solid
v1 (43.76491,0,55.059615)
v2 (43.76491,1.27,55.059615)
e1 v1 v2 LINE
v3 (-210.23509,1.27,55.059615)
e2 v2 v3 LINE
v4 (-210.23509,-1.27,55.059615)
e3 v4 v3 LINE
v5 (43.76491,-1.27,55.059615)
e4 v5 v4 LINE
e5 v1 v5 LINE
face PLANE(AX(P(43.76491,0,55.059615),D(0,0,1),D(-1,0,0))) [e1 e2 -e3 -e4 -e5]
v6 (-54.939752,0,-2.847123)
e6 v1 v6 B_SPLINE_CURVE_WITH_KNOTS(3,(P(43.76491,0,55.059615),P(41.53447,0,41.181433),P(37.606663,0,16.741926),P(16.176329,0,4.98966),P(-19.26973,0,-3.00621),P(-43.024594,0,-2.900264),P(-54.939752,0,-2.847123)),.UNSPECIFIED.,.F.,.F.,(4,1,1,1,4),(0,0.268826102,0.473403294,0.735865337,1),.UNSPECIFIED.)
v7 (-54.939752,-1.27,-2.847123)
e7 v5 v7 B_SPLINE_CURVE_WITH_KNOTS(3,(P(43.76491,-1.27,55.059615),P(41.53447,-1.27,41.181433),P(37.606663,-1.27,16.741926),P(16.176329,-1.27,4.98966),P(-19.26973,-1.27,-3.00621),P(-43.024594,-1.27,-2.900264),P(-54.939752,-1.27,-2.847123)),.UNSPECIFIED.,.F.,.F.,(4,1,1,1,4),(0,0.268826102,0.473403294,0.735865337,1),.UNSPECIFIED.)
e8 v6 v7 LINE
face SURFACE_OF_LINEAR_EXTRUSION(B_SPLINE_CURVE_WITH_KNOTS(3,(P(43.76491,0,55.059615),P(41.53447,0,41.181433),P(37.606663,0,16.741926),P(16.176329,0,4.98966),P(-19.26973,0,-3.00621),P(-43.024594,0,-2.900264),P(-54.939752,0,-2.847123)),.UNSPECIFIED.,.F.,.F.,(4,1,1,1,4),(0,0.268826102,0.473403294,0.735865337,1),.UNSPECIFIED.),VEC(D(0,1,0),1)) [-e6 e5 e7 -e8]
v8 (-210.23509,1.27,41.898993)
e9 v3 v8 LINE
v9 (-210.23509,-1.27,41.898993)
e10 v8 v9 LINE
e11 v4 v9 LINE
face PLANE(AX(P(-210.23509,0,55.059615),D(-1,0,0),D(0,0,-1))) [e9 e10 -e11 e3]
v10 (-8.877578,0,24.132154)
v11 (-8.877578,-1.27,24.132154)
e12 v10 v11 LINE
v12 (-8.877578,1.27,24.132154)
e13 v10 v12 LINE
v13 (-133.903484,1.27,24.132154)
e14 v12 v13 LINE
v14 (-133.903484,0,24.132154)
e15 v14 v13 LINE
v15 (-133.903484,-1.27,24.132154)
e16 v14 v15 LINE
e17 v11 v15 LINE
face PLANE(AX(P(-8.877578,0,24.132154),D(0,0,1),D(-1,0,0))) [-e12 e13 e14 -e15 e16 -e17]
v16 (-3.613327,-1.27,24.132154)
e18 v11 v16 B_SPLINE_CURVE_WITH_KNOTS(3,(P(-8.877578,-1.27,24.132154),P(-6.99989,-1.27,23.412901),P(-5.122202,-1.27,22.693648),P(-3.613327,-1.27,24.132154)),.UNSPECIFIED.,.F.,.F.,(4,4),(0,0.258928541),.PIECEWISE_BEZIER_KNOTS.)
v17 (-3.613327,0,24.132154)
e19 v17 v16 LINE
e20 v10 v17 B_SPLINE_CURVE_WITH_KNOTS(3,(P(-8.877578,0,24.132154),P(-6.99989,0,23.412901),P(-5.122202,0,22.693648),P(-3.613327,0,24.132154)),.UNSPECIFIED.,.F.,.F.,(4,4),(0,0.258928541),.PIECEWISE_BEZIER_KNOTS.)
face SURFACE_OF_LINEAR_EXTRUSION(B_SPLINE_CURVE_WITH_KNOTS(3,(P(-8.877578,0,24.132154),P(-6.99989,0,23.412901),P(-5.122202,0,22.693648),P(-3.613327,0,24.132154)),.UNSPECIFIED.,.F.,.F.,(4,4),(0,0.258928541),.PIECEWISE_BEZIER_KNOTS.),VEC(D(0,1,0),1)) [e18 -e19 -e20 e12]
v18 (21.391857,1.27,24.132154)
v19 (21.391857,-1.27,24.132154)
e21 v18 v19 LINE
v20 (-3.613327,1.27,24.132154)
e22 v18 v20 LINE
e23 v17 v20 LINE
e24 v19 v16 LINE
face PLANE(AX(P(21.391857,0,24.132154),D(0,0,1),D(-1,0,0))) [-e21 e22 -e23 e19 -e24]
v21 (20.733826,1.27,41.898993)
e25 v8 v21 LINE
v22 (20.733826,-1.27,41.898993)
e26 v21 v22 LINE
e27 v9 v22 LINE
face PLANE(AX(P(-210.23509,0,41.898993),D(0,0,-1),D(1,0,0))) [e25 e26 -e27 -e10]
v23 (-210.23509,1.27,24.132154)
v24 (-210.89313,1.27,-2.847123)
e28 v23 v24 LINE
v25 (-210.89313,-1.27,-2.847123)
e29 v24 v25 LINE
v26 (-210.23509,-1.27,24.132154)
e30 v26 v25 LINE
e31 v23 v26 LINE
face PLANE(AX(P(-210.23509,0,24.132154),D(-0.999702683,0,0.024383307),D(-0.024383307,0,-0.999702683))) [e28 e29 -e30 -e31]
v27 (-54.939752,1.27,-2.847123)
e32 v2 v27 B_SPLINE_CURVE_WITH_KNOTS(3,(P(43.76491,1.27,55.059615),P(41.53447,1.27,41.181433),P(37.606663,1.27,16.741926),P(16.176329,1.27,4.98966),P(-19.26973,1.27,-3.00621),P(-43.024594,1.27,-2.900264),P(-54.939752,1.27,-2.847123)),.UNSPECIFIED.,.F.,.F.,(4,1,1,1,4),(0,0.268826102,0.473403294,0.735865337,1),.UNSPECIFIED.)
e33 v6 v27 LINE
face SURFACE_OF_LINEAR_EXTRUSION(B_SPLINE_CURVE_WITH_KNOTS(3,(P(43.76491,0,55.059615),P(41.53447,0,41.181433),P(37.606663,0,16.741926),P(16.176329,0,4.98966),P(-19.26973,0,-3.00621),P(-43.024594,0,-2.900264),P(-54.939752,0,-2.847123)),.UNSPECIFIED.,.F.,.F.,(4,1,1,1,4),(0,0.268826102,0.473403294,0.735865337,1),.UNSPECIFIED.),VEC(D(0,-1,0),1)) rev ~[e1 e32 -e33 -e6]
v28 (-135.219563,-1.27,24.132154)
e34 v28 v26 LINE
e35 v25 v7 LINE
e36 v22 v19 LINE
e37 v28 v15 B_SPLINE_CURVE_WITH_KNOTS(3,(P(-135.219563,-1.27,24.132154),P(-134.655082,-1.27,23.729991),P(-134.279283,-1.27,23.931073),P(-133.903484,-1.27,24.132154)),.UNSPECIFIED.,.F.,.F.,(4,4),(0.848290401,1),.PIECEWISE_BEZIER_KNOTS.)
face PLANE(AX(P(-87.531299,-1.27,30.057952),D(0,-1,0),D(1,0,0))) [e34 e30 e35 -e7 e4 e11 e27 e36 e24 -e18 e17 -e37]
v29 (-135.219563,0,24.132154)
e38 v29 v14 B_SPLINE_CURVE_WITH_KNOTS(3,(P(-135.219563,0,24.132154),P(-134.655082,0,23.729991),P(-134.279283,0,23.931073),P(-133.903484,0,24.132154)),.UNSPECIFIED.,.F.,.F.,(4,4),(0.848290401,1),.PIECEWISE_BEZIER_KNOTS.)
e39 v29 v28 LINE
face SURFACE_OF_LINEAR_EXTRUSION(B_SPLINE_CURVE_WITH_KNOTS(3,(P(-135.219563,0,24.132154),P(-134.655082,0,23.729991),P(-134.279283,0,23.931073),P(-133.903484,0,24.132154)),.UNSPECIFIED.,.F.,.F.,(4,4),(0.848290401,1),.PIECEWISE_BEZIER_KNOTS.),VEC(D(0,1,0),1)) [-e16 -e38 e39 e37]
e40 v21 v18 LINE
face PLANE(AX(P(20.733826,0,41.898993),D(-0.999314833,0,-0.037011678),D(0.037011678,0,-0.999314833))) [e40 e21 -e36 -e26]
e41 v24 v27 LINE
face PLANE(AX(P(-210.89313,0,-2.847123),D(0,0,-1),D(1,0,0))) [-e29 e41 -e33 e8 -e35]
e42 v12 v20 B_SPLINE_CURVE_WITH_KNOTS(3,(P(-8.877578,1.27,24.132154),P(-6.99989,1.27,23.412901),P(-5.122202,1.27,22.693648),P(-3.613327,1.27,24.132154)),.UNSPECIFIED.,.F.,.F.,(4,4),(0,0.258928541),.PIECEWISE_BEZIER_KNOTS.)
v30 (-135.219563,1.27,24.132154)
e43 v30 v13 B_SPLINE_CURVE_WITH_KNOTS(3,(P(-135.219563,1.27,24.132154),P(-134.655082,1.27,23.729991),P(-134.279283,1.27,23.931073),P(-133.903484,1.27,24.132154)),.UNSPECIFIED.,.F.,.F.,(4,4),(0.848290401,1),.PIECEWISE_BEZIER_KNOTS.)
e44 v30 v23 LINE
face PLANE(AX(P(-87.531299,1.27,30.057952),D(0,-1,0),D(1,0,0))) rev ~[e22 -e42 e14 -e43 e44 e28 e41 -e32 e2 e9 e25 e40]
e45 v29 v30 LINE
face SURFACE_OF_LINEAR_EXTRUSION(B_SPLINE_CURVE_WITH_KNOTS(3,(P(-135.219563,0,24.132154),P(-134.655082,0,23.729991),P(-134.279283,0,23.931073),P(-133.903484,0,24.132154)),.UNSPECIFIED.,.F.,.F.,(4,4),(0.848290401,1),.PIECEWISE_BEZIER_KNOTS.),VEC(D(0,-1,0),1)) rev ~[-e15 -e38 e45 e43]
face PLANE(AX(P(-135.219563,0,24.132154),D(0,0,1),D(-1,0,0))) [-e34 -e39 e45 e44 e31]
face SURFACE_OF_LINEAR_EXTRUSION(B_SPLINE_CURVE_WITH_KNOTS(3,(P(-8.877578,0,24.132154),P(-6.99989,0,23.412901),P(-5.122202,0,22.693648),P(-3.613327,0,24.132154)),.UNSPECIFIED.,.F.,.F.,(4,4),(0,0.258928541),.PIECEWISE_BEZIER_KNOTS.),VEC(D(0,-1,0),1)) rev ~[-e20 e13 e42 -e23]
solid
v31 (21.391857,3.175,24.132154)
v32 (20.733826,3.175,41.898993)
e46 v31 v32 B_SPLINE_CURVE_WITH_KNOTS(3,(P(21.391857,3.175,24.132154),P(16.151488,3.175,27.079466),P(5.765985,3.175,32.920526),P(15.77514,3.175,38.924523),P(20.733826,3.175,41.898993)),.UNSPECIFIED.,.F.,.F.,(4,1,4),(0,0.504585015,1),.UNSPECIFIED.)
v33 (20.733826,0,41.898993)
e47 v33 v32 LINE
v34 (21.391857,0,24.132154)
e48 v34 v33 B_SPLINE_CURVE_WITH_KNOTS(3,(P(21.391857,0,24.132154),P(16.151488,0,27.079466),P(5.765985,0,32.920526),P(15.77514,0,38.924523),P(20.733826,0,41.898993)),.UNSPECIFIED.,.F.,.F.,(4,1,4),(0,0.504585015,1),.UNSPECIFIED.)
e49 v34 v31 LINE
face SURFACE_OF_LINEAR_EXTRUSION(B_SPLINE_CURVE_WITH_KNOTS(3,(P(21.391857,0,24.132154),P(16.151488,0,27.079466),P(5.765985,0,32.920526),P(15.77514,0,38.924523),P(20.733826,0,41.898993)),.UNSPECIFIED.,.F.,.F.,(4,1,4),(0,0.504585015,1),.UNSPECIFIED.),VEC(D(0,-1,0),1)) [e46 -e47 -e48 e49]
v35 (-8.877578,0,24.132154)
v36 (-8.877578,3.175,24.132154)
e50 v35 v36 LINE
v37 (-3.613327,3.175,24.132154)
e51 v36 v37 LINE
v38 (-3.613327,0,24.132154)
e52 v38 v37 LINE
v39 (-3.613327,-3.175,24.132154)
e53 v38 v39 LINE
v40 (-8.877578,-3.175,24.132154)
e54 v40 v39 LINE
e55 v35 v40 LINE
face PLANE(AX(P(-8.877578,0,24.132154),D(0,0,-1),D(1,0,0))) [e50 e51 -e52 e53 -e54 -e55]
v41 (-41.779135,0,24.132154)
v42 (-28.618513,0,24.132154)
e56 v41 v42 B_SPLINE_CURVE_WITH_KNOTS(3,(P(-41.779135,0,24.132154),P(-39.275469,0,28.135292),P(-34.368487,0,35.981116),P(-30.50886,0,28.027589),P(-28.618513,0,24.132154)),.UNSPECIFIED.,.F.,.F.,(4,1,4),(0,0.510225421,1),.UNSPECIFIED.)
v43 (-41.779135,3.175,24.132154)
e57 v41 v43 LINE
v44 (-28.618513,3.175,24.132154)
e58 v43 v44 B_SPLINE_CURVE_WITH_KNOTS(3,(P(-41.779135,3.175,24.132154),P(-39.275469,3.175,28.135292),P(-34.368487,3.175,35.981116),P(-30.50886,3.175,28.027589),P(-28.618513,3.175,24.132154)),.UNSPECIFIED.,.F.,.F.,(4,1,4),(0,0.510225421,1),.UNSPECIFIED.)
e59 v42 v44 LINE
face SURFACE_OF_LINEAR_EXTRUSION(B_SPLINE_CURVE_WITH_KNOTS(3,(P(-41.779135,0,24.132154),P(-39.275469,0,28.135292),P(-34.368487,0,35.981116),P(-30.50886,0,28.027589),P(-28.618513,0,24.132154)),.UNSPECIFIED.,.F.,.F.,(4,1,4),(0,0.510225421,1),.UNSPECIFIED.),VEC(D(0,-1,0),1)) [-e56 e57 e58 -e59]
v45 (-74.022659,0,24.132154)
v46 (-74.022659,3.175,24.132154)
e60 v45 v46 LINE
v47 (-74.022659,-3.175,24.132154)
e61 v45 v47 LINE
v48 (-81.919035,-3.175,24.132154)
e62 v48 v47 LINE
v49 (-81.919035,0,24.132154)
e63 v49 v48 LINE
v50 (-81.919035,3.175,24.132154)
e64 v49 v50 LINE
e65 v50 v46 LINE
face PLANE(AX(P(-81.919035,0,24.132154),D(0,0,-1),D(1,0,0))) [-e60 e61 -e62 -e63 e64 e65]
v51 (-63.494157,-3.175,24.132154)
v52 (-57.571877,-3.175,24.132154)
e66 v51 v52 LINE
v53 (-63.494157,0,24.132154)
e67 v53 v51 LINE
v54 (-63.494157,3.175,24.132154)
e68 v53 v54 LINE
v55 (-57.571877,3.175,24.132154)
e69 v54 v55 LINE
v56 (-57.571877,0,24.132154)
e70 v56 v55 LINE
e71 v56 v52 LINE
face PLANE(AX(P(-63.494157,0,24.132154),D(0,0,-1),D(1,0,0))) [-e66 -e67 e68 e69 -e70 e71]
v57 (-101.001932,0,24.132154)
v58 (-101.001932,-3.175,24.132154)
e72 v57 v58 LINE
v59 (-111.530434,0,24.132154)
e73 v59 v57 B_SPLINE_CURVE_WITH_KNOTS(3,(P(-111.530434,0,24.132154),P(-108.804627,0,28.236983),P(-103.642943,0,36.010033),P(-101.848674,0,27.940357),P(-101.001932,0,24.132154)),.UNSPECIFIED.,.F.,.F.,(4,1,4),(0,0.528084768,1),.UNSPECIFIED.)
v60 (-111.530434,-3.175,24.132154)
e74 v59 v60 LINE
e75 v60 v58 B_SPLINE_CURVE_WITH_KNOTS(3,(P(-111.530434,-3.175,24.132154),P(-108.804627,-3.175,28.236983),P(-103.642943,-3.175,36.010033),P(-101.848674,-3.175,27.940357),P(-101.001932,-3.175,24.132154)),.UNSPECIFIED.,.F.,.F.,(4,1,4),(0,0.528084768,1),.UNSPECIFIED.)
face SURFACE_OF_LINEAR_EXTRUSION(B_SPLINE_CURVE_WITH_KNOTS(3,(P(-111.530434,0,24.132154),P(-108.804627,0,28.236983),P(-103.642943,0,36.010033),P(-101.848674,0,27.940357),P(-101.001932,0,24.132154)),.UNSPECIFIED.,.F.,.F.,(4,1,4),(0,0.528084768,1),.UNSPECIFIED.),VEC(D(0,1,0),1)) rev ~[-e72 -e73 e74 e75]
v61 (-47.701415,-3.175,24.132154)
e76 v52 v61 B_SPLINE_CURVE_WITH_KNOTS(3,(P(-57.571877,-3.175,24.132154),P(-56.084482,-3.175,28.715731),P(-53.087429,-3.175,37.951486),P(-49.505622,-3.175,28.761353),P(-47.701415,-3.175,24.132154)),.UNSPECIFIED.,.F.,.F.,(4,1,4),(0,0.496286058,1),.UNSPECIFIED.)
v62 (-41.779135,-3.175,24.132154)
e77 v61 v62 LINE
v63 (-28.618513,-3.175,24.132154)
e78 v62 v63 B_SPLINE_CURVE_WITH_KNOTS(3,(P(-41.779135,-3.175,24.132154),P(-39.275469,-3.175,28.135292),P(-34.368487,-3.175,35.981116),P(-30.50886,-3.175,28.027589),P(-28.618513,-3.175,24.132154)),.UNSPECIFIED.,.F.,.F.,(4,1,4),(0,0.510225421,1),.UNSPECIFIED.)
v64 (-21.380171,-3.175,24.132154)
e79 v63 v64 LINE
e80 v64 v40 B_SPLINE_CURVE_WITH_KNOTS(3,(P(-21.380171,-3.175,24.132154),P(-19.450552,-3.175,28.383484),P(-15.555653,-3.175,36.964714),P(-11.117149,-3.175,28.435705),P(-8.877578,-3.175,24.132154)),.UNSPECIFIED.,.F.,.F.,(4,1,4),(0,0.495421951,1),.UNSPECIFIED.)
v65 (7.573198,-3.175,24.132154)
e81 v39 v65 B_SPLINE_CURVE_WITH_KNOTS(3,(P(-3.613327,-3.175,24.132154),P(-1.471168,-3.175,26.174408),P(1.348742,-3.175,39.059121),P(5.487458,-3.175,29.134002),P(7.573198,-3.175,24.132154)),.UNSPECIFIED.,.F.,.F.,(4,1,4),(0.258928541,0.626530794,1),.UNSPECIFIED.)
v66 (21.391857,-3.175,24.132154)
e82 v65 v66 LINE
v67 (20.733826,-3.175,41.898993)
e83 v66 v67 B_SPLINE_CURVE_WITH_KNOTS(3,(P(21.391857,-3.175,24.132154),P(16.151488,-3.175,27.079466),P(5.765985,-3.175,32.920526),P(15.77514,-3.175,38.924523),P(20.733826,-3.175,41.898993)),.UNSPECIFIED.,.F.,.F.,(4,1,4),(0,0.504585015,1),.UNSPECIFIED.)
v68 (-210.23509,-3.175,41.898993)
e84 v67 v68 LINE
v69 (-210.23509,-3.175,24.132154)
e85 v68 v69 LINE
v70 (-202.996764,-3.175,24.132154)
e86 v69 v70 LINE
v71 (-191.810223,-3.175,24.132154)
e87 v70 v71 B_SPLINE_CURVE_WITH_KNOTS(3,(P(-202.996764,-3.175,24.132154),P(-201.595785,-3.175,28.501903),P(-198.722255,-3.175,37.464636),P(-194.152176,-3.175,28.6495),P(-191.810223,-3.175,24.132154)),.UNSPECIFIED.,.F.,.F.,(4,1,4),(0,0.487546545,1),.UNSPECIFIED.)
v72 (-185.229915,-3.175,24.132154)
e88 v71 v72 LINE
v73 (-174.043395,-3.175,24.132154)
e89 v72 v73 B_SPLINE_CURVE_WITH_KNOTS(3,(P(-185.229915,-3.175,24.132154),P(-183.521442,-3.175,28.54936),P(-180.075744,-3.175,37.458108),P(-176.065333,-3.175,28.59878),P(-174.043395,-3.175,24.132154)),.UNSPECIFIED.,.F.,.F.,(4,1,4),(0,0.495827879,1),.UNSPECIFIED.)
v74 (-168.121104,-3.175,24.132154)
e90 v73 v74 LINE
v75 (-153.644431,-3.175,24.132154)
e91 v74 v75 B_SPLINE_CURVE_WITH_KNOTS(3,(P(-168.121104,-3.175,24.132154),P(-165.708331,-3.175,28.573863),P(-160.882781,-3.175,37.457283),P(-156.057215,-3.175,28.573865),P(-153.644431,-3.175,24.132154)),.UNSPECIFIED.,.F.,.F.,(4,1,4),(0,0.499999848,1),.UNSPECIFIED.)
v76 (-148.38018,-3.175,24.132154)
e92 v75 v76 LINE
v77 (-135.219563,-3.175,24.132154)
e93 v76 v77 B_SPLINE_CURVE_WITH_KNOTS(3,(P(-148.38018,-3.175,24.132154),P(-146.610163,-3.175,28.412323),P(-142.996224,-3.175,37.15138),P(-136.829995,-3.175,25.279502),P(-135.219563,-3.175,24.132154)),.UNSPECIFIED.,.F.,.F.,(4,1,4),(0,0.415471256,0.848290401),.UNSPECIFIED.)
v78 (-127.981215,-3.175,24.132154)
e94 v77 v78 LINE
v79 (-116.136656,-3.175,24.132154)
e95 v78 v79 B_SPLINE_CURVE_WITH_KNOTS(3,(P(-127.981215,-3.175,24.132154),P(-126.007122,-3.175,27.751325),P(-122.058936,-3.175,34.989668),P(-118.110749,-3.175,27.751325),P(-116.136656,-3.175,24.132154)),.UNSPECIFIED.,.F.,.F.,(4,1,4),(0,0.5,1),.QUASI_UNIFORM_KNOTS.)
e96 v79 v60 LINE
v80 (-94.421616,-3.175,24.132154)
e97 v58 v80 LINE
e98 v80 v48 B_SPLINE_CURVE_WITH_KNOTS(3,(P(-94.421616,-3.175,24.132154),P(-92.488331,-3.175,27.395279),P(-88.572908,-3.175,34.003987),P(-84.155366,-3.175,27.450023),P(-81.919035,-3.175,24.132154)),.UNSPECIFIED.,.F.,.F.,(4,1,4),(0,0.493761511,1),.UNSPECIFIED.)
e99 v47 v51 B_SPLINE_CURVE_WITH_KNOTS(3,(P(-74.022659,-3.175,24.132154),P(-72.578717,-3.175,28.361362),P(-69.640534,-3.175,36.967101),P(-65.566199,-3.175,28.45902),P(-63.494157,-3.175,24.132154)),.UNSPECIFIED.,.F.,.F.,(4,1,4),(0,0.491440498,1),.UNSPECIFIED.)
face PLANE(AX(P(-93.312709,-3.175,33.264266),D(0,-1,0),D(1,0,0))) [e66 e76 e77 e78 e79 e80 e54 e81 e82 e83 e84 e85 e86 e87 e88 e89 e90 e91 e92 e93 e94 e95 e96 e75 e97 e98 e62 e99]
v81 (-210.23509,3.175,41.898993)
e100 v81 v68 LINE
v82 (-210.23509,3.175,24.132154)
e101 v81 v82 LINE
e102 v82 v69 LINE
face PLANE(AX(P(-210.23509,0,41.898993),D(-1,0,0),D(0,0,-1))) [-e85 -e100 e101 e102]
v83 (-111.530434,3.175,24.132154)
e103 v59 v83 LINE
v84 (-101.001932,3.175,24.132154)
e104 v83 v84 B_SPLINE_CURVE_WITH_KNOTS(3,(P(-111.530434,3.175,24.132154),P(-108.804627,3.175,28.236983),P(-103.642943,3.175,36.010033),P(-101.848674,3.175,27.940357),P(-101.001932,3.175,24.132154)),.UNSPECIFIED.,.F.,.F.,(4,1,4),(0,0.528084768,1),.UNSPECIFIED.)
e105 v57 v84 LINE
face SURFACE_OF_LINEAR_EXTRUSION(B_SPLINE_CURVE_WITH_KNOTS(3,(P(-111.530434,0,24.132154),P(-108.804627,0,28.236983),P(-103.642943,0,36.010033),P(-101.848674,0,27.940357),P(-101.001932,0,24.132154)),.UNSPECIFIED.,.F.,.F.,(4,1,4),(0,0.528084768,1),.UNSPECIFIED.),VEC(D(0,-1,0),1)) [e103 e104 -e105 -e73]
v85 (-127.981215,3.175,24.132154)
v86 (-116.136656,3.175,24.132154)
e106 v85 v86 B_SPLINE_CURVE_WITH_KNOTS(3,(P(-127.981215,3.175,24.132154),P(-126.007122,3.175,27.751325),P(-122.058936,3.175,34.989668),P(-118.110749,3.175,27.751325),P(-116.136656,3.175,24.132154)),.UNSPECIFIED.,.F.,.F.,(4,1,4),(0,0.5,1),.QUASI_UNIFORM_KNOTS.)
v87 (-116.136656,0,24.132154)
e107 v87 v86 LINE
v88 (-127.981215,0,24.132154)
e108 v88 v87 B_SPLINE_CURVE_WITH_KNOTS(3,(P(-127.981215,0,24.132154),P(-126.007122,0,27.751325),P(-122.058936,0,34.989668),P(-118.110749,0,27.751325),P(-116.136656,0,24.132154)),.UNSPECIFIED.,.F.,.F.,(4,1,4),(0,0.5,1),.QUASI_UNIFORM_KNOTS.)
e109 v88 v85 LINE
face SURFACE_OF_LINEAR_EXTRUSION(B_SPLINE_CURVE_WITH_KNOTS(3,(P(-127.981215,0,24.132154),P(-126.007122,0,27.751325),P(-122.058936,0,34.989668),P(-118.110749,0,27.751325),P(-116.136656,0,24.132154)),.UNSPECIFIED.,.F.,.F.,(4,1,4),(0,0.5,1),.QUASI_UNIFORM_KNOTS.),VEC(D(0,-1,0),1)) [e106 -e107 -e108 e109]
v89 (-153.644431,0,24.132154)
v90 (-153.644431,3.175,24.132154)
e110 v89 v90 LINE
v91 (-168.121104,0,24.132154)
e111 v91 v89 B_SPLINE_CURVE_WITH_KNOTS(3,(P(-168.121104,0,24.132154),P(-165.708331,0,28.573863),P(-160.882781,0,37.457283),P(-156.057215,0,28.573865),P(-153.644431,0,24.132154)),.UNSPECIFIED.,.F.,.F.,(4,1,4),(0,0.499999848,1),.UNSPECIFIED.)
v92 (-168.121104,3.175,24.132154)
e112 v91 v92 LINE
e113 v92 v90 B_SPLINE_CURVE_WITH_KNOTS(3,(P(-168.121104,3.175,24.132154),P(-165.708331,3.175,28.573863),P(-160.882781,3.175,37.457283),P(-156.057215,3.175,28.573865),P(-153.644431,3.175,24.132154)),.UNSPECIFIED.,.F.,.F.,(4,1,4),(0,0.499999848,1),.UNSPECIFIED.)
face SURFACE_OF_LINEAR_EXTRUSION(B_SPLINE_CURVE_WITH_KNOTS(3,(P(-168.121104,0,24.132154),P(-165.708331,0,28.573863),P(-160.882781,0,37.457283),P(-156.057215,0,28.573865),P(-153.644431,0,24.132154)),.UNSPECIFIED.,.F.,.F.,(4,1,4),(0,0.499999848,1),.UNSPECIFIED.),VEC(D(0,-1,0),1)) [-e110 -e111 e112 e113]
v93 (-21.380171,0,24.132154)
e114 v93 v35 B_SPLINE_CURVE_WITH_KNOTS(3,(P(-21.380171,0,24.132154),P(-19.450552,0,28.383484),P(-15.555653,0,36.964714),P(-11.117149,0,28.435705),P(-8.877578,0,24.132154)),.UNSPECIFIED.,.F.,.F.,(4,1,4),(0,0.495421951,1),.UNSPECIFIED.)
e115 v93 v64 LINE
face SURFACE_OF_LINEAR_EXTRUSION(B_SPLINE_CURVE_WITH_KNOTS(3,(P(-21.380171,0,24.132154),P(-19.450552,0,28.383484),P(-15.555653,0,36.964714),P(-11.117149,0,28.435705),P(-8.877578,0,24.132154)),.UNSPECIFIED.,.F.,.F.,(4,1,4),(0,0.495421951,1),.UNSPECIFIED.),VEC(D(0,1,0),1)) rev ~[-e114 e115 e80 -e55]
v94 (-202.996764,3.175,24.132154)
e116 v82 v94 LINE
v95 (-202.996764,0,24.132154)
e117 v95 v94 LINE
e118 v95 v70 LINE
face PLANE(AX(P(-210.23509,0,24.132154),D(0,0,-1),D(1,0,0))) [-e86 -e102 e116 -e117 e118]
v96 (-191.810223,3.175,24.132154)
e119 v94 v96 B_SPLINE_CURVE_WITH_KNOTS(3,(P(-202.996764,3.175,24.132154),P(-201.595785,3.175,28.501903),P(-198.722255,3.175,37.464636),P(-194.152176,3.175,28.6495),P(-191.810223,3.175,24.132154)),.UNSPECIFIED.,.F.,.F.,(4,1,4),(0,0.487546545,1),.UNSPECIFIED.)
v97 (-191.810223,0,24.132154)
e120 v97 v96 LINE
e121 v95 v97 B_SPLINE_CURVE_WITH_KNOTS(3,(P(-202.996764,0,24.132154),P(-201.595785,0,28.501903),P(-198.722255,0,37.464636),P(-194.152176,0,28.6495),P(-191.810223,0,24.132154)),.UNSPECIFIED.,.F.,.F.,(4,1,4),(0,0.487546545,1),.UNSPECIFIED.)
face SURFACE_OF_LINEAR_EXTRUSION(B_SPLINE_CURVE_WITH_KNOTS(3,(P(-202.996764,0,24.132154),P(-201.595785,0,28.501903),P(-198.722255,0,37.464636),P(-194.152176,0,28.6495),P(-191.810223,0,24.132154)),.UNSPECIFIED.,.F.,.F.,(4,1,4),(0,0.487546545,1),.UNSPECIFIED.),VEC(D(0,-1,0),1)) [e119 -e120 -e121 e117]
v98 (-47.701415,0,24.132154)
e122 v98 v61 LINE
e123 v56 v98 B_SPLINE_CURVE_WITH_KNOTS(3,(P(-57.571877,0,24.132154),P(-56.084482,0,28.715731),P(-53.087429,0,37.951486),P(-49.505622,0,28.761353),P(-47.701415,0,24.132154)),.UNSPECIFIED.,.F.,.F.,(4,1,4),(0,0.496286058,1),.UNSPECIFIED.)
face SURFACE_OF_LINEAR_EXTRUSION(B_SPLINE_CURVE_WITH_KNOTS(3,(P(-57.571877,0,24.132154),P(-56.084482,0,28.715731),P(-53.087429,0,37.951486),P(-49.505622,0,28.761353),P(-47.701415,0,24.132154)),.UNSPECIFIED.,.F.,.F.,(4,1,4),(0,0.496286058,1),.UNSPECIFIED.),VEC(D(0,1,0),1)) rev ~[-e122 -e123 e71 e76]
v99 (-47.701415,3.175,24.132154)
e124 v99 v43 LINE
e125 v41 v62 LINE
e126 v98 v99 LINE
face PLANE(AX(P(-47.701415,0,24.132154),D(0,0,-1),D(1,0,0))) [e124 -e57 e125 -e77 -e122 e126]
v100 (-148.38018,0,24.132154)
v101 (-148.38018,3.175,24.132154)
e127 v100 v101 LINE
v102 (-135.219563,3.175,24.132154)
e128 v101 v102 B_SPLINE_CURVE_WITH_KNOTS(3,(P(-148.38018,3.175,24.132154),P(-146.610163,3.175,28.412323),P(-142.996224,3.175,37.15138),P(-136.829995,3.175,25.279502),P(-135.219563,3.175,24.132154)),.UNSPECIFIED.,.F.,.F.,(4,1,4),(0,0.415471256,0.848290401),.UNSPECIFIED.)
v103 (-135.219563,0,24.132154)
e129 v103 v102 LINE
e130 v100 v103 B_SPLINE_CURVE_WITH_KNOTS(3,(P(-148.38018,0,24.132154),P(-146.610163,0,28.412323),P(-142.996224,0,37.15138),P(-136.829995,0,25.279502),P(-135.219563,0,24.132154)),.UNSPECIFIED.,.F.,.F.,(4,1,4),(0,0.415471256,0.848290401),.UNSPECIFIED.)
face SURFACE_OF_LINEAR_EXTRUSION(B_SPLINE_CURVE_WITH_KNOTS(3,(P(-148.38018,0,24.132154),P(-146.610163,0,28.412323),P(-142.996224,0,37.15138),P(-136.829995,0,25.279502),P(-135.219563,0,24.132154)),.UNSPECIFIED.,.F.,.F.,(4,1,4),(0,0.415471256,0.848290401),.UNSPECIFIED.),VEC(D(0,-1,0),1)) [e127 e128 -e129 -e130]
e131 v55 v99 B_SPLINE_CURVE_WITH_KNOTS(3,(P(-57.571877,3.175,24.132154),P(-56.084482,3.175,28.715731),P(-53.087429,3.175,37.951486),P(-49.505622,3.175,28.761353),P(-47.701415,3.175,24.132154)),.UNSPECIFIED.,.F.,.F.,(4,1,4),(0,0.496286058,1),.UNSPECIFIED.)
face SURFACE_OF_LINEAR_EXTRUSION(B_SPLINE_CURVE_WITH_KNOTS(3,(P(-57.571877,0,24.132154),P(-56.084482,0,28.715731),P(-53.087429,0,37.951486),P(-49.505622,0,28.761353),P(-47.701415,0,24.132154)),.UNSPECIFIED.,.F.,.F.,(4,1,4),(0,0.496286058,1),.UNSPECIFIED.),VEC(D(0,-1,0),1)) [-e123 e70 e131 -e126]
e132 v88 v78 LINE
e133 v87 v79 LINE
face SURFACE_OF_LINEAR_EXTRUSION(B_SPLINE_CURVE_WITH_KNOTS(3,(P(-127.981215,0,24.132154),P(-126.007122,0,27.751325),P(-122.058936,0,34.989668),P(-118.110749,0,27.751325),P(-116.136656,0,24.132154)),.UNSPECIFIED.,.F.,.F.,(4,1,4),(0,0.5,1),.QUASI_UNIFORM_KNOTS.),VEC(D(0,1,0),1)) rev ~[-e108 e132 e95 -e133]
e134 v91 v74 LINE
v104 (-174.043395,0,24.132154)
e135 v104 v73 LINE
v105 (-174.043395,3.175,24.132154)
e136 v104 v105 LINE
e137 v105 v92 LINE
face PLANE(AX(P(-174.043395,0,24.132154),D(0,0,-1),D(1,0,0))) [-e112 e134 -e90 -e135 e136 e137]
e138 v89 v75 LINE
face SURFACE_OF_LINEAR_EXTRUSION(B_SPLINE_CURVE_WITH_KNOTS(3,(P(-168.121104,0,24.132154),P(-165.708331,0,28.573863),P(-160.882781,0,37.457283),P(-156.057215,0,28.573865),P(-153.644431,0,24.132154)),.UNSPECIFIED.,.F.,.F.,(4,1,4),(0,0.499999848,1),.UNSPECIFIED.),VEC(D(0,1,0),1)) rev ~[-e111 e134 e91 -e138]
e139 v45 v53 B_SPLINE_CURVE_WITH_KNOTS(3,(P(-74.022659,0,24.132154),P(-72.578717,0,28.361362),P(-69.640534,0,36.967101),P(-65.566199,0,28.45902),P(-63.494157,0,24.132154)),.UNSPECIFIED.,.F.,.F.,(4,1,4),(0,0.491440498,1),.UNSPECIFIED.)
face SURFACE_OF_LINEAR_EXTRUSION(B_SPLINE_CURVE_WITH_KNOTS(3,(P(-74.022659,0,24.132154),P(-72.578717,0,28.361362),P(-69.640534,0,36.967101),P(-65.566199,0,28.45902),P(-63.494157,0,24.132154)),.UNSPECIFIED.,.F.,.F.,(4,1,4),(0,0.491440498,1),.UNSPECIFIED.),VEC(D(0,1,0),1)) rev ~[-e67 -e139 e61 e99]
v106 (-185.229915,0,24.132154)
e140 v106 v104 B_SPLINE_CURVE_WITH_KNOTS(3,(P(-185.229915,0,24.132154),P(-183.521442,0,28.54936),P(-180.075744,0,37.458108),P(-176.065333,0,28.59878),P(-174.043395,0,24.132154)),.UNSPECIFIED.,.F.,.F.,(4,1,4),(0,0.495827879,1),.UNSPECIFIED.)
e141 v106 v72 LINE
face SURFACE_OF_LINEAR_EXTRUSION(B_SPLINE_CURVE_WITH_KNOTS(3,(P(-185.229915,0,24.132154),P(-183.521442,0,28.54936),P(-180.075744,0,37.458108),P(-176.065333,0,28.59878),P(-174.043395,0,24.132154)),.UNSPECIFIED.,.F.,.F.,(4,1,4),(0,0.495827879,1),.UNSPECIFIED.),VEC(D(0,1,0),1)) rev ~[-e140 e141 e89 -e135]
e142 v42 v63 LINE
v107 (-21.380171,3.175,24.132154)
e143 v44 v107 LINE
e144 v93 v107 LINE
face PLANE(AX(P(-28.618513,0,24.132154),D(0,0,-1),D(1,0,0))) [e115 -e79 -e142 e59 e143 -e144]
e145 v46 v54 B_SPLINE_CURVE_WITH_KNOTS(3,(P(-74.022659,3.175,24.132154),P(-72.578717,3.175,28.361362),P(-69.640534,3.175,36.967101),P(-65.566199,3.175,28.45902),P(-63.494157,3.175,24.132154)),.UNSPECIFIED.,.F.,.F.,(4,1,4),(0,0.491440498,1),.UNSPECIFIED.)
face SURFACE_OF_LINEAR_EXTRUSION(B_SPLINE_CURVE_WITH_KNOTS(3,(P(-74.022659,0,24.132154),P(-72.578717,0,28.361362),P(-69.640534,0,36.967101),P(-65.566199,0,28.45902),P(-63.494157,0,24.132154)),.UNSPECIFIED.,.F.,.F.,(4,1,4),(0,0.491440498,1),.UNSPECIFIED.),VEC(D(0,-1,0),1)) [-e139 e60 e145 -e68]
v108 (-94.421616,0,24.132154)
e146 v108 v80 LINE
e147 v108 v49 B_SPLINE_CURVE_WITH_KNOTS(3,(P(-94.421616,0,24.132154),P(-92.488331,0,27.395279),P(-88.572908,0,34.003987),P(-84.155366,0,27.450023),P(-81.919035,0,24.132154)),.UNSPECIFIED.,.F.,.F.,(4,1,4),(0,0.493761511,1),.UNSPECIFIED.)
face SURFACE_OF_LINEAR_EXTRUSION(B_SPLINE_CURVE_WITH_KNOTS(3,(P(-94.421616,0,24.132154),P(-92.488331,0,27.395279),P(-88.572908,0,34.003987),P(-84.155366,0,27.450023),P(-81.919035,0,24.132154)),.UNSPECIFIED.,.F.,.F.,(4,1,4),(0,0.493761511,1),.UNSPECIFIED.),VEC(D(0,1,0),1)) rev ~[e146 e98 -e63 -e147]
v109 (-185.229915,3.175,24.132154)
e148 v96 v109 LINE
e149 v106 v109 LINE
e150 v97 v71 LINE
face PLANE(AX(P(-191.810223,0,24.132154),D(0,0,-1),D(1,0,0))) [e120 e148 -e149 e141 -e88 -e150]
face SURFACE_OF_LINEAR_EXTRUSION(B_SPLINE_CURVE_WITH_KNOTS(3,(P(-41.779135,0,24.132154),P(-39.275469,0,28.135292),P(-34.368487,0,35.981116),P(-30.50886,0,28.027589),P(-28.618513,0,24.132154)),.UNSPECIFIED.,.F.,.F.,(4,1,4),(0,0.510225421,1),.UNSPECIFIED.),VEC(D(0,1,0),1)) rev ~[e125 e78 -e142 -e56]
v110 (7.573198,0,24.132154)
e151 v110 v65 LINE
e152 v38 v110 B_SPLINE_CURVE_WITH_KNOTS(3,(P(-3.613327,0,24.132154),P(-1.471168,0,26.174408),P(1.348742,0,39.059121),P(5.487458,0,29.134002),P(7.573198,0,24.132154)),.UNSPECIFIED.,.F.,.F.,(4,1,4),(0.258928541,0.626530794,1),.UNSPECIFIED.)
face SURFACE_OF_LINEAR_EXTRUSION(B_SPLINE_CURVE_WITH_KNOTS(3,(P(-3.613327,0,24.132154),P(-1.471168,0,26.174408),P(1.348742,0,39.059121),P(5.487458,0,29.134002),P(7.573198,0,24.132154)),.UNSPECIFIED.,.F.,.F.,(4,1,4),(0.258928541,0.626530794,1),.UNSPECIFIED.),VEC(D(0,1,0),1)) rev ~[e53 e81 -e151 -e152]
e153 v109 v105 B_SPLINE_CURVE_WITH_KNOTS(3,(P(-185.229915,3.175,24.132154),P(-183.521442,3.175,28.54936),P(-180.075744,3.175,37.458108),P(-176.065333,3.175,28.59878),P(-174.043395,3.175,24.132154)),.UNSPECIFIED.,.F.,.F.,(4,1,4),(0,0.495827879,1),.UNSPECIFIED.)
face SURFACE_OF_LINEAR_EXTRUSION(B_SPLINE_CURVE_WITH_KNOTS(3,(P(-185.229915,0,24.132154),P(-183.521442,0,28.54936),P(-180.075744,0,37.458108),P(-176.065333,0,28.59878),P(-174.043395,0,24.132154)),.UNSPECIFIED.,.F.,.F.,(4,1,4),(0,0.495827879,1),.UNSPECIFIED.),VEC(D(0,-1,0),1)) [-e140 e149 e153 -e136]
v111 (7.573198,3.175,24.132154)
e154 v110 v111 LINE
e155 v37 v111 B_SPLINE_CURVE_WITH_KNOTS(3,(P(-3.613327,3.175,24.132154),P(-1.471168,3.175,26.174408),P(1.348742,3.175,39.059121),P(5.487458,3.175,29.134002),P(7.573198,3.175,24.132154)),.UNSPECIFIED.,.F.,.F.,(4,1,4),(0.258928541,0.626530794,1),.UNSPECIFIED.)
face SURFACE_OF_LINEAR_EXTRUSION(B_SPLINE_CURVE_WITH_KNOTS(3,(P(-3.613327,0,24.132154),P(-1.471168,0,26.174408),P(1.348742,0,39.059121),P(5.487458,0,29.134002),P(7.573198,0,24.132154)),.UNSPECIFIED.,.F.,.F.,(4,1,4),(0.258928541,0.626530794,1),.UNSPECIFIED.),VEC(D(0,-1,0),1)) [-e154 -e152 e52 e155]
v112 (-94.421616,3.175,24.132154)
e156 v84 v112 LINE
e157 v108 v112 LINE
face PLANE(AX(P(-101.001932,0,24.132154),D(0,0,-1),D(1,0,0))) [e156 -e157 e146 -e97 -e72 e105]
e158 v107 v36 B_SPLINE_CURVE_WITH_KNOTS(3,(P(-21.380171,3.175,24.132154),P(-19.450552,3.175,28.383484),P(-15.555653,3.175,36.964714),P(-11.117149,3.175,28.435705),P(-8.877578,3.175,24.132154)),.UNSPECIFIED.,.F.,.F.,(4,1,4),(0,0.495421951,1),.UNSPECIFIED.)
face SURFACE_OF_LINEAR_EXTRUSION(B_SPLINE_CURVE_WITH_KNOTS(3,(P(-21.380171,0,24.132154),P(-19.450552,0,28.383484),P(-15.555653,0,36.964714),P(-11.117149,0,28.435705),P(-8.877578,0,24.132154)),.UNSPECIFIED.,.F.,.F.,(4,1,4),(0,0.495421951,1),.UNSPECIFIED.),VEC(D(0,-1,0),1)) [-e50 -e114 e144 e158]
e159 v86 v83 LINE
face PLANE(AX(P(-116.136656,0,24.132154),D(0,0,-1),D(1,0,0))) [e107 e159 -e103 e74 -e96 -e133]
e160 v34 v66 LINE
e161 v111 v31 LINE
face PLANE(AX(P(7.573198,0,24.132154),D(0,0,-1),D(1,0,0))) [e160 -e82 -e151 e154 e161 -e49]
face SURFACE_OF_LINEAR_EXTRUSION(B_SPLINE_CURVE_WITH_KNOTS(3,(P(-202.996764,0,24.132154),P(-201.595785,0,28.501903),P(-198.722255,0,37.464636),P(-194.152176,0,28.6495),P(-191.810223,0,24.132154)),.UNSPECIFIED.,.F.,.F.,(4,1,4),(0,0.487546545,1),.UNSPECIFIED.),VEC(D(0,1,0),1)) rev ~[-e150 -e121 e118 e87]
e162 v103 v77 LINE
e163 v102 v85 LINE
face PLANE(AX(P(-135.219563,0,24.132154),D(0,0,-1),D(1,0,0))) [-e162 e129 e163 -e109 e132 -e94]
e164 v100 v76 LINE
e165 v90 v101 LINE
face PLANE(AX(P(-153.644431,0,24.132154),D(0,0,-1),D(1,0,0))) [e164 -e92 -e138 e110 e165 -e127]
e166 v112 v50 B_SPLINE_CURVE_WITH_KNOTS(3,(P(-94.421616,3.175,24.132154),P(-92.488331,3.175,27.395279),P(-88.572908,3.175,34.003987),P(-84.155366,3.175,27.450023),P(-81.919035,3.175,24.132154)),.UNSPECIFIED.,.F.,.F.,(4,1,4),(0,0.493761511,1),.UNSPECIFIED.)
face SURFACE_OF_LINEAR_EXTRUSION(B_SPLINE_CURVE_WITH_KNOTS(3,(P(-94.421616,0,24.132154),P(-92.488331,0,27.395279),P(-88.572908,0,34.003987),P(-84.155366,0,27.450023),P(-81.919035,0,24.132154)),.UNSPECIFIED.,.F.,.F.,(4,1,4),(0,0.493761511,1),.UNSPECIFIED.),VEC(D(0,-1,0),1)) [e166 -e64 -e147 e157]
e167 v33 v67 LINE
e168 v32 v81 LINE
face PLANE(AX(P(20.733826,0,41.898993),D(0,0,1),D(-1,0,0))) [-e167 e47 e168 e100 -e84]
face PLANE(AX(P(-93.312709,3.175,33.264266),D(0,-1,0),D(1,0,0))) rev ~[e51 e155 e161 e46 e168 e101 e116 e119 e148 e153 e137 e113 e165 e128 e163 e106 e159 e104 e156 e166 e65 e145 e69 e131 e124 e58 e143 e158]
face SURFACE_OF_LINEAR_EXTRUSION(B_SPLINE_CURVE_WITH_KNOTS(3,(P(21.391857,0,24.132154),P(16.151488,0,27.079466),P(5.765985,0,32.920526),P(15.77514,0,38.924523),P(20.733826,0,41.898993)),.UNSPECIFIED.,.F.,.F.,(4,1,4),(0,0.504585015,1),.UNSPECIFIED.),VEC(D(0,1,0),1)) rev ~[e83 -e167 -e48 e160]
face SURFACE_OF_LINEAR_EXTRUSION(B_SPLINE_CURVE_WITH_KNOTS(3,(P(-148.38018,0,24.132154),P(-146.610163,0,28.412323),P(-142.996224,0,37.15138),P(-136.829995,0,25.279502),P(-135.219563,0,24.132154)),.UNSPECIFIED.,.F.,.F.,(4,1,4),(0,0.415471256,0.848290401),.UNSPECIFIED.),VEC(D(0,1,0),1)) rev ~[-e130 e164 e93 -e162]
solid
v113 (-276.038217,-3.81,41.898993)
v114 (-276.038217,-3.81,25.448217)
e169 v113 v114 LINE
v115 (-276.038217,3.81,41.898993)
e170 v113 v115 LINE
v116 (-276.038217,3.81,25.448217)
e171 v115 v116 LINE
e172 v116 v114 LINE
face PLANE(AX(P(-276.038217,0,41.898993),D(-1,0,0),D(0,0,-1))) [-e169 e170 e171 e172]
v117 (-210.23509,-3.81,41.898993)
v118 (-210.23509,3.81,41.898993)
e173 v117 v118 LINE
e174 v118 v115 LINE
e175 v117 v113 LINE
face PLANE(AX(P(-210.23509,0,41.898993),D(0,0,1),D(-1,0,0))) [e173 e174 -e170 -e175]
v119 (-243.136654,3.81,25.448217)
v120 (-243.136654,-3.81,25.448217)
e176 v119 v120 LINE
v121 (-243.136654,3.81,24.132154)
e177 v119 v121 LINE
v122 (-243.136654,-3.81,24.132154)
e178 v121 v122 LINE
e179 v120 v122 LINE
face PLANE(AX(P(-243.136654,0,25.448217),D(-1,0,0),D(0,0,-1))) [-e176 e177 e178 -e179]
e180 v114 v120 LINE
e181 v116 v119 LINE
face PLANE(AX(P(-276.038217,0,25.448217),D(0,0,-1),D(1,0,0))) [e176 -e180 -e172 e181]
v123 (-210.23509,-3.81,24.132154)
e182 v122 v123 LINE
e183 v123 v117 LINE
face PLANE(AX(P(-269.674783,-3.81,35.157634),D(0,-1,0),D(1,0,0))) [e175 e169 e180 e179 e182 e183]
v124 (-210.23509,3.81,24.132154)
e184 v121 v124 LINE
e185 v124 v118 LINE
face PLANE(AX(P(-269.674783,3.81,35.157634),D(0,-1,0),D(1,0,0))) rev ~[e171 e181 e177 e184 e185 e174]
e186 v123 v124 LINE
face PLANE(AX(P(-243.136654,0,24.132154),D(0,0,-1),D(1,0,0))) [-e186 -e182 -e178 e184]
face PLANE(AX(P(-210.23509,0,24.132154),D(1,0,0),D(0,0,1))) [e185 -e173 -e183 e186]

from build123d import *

# Parameters (mm, degrees)
F1_DEPTH = 1.27
F2_DEPTH = 3.81
F3_DEPTH = 3.175


# Not quite as in the source:
# - the program builds the solid bodies; features that only make, move or delete a surface that nothing else refers to are left out


with BuildPart() as f1:
    # F0 (on Front) → F1 (new body, symmetric)
    with BuildSketch(Plane.XZ):
        with BuildLine():
            Line((-210.2350903421, 55.0596148509), (-210.2350903421, 41.8989928542))
            Line((-210.2350903421, 41.8989928542), (20.7338259748, 41.8989928542))
            Line((20.7338259748, 41.8989928542), (21.3918573496, 24.1321539834))
            Line((21.3918573496, 24.1321539834), (7.5731984796, 24.1321539834))
            Line((7.5731984796, 24.1321539834), (-3.6133266435, 24.1321539834))
            add(Edge.make_bspline(
                [(-8.8775776416, 24.1321539834), (-6.9998897347, 23.4129011572), (-5.1222018278, 22.693648331), (-3.6133266435, 24.1321539834)],
                knots=[0, 0, 0, 0, 0.2589285415, 0.2589285415, 0.2589285415, 0.2589285415], degree=3))
            Line((-8.8775776416, 24.1321539834), (-21.3801710128, 24.1321539834))
            Line((-21.3801710128, 24.1321539834), (-28.6185133859, 24.1321539834))
            Line((-28.6185133859, 24.1321539834), (-41.7791353826, 24.1321539834))
            Line((-41.7791353826, 24.1321539834), (-47.7014150062, 24.1321539834))
            Line((-47.7014150062, 24.1321539834), (-57.5718773798, 24.1321539834))
            Line((-57.5718773798, 24.1321539834), (-63.4941570034, 24.1321539834))
            Line((-63.4941570034, 24.1321539834), (-74.0226589996, 24.1321539834))
            Line((-74.0226589996, 24.1321539834), (-81.9190354967, 24.1321539834))
            Line((-81.9190354967, 24.1321539834), (-94.4216164963, 24.1321539834))
            Line((-94.4216164963, 24.1321539834), (-101.0019316185, 24.1321539834))
            Line((-101.0019316185, 24.1321539834), (-111.5304336147, 24.1321539834))
            Line((-111.5304336147, 24.1321539834), (-116.1366559872, 24.1321539834))
            Line((-116.1366559872, 24.1321539834), (-127.9812152344, 24.1321539834))
            Line((-127.9812152344, 24.1321539834), (-133.903483861, 24.1321539834))
            add(Edge.make_bspline(
                [(-135.219563106, 24.1321539834), (-134.6550824726, 23.7299911861), (-134.2792831668, 23.9310725847), (-133.903483861, 24.1321539834)],
                knots=[0.8482904011, 0.8482904011, 0.8482904011, 0.8482904011, 1, 1, 1, 1], degree=3))
            Line((-135.219563106, 24.1321539834), (-148.3801796042, 24.1321539834))
            Line((-148.3801796042, 24.1321539834), (-153.6444306023, 24.1321539834))
            Line((-153.6444306023, 24.1321539834), (-168.1211043515, 24.1321539834))
            Line((-168.1211043515, 24.1321539834), (-174.0433949721, 24.1321539834))
            Line((-174.0433949721, 24.1321539834), (-185.2299145968, 24.1321539834))
            Line((-185.2299145968, 24.1321539834), (-191.8102228459, 24.1321539834))
            Line((-191.8102228459, 24.1321539834), (-202.9967644645, 24.1321539834))
            Line((-202.9967644645, 24.1321539834), (-210.2350903421, 24.1321539834))
            Line((-210.2350903421, 24.1321539834), (-210.8931299646, -2.8471227594))
            Line((-210.8931299646, -2.8471227594), (-54.9397518808, -2.8471227594))
            add(Edge.make_bspline(
                [(43.7649096579, 55.0596148509), (41.5344704617, 41.1814325972), (37.606662647, 16.7419263316), (16.1763288382, 4.9896597977), (-19.2697295543, -3.0062101287), (-43.0245937063, -2.9002640541), (-54.9397518808, -2.8471227594)],
                knots=[0, 0, 0, 0, 0.2688261018, 0.4734032944, 0.7358653369, 1, 1, 1, 1], degree=3))
            Line((43.7649096579, 55.0596148509), (-210.2350903421, 55.0596148509))
        make_face()
    extrude(amount=F1_DEPTH, both=True)


with BuildPart() as f2:
    # F0 (on Front) → F2 (new body, symmetric)
    with BuildSketch(Plane.XZ):
        Polygon((-259.5874352014, 41.8989928542), (-276.0382168211, 41.8989928542), (-276.0382168211, 25.4482167329), (-270.1159262005, 25.4482167329), align=None)
        Polygon((-250.3750014533, 41.8989928542), (-259.5874352014, 41.8989928542), (-270.1159262005, 25.4482167329), (-259.5874352014, 25.4482167329), align=None)
        Polygon((-243.1366535816, 41.8989928542), (-250.3750014533, 41.8989928542), (-259.5874352014, 25.4482167329), (-243.1366535816, 25.4482167329), align=None)
        Polygon((-226.6858719619, 41.8989928542), (-243.1366535816, 41.8989928542), (-243.1366535816, 25.4482167329), align=None)
        Polygon((-226.6858719619, 41.8989928542), (-243.1366535816, 25.4482167329), (-243.1366535816, 24.1321539834), (-233.266191208, 24.1321539834), (-218.7894954648, 41.8989928542), align=None)
        Polygon((-210.2350903421, 41.8989928542), (-218.7894954648, 41.8989928542), (-233.266191208, 24.1321539834), (-220.7635923383, 24.1321539834), (-210.2350903421, 33.0155734188), align=None)
        Polygon((-210.2350903421, 33.0155734188), (-220.7635923383, 24.1321539834), (-210.2350903421, 24.1321539834), align=None)
    extrude(amount=F2_DEPTH, both=True)


with BuildPart() as f3:
    # F0 (on Front) → F3 (new body, symmetric)
    with BuildSketch(Plane.XZ):
        with BuildLine():
            Line((20.7338259748, 41.8989928542), (-210.2350903421, 41.8989928542))
            Line((-210.2350903421, 41.8989928542), (-210.2350903421, 33.0155734188))
            Line((-210.2350903421, 33.0155734188), (-210.2350903421, 24.1321539834))
            Line((-210.2350903421, 24.1321539834), (-202.9967644645, 24.1321539834))
            add(Edge.make_bspline(
                [(-202.9967644645, 24.1321539834), (-201.5957848409, 28.5019031742), (-198.7222548422, 37.4646355189), (-194.1521756938, 28.6495004192), (-191.8102228459, 24.1321539834)],
                knots=[0, 0, 0, 0, 0.4875465453, 1, 1, 1, 1], degree=3))
            Line((-191.8102228459, 24.1321539834), (-185.2299145968, 24.1321539834))
            add(Edge.make_bspline(
                [(-185.2299145968, 24.1321539834), (-183.5214416822, 28.5493597006), (-180.0757441181, 37.4581078877), (-176.0653326357, 28.5987800772), (-174.0433949721, 24.1321539834)],
                knots=[0, 0, 0, 0, 0.4958278789, 1, 1, 1, 1], degree=3))
            Line((-174.0433949721, 24.1321539834), (-168.1211043515, 24.1321539834))
            add(Edge.make_bspline(
                [(-168.1211043515, 24.1321539834), (-165.7083305261, 28.5738628036), (-160.8827814128, 37.4572831365), (-156.0572146933, 28.5738645986), (-153.6444306023, 24.1321539834)],
                knots=[0, 0, 0, 0, 0.4999998484, 1, 1, 1, 1], degree=3))
            Line((-153.6444306023, 24.1321539834), (-148.3801796042, 24.1321539834))
            add(Edge.make_bspline(
                [(-148.3801796042, 24.1321539834), (-146.6101632269, 28.4123234005), (-142.9962239159, 37.1513795538), (-136.8299953213, 25.2795023356), (-135.219563106, 24.1321539834)],
                knots=[0, 0, 0, 0, 0.4154712555, 0.8482904011, 0.8482904011, 0.8482904011, 0.8482904011], degree=3))
            Line((-135.219563106, 24.1321539834), (-133.903483861, 24.1321539834))
            Line((-133.903483861, 24.1321539834), (-127.9812152344, 24.1321539834))
            add(Edge.make_bspline(
                [(-127.9812152344, 24.1321539834), (-126.0071220265, 27.75132517), (-122.0589356108, 34.9896675431), (-118.1107491951, 27.75132517), (-116.1366559872, 24.1321539834)],
                knots=[0, 0, 0, 0, 0.5, 1, 1, 1, 1], degree=3))
            Line((-116.1366559872, 24.1321539834), (-111.5304336147, 24.1321539834))
            add(Edge.make_bspline(
                [(-111.5304336147, 24.1321539834), (-108.8046270355, 28.2369832553), (-103.642943259, 36.0100331921), (-101.848674416, 27.9403570656), (-101.0019316185, 24.1321539834)],
                knots=[0, 0, 0, 0, 0.5280847679, 1, 1, 1, 1], degree=3))
            Line((-101.0019316185, 24.1321539834), (-94.4216164963, 24.1321539834))
            add(Edge.make_bspline(
                [(-94.4216164963, 24.1321539834), (-92.488331209, 27.3952792744), (-88.5729079881, 34.0039865465), (-84.1553655194, 27.4500227235), (-81.9190354967, 24.1321539834)],
                knots=[0, 0, 0, 0, 0.4937615114, 1, 1, 1, 1], degree=3))
            Line((-81.9190354967, 24.1321539834), (-74.0226589996, 24.1321539834))
            add(Edge.make_bspline(
                [(-74.0226589996, 24.1321539834), (-72.5787170502, 28.3613624742), (-69.6405343905, 36.967101131), (-65.5661989873, 28.4590196598), (-63.4941570034, 24.1321539834)],
                knots=[0, 0, 0, 0, 0.491440498, 1, 1, 1, 1], degree=3))
            Line((-63.4941570034, 24.1321539834), (-57.5718773798, 24.1321539834))
            add(Edge.make_bspline(
                [(-57.5718773798, 24.1321539834), (-56.084481964, 28.7157307739), (-53.0874293735, 37.9514864762), (-49.5056215462, 28.7613525636), (-47.7014150062, 24.1321539834)],
                knots=[0, 0, 0, 0, 0.496286058, 1, 1, 1, 1], degree=3))
            Line((-47.7014150062, 24.1321539834), (-41.7791353826, 24.1321539834))
            add(Edge.make_bspline(
                [(-41.7791353826, 24.1321539834), (-39.275468623, 28.135292461), (-34.3684870064, 35.9811157289), (-30.5088603888, 28.0275891282), (-28.6185133859, 24.1321539834)],
                knots=[0, 0, 0, 0, 0.5102254207, 1, 1, 1, 1], degree=3))
            Line((-28.6185133859, 24.1321539834), (-21.3801710128, 24.1321539834))
            add(Edge.make_bspline(
                [(-21.3801710128, 24.1321539834), (-19.4505524478, 28.3834837385), (-15.5556532425, 36.9647138246), (-11.1171492996, 28.4357047423), (-8.8775776416, 24.1321539834)],
                knots=[0, 0, 0, 0, 0.4954219514, 1, 1, 1, 1], degree=3))
            Line((-8.8775776416, 24.1321539834), (-3.6133266435, 24.1321539834))
            add(Edge.make_bspline(
                [(-3.6133266435, 24.1321539834), (-1.4711683739, 26.1744082476), (1.3487420826, 39.0591214669), (5.4874578129, 29.1340017152), (7.5731984796, 24.1321539834)],
                knots=[0.2589285415, 0.2589285415, 0.2589285415, 0.2589285415, 0.6265307939, 1, 1, 1, 1], degree=3))
            Line((7.5731984796, 24.1321539834), (21.3918573496, 24.1321539834))
            add(Edge.make_bspline(
                [(21.3918573496, 24.1321539834), (16.151488001, 27.0794656184), (5.7659846892, 32.9205261829), (15.7751403015, 38.9245229088), (20.7338259748, 41.8989928542)],
                knots=[0, 0, 0, 0, 0.5045850154, 1, 1, 1, 1], degree=3))
        make_face()
    extrude(amount=F3_DEPTH, both=True)


solid = Compound([f1.part, f2.part, f3.part])
